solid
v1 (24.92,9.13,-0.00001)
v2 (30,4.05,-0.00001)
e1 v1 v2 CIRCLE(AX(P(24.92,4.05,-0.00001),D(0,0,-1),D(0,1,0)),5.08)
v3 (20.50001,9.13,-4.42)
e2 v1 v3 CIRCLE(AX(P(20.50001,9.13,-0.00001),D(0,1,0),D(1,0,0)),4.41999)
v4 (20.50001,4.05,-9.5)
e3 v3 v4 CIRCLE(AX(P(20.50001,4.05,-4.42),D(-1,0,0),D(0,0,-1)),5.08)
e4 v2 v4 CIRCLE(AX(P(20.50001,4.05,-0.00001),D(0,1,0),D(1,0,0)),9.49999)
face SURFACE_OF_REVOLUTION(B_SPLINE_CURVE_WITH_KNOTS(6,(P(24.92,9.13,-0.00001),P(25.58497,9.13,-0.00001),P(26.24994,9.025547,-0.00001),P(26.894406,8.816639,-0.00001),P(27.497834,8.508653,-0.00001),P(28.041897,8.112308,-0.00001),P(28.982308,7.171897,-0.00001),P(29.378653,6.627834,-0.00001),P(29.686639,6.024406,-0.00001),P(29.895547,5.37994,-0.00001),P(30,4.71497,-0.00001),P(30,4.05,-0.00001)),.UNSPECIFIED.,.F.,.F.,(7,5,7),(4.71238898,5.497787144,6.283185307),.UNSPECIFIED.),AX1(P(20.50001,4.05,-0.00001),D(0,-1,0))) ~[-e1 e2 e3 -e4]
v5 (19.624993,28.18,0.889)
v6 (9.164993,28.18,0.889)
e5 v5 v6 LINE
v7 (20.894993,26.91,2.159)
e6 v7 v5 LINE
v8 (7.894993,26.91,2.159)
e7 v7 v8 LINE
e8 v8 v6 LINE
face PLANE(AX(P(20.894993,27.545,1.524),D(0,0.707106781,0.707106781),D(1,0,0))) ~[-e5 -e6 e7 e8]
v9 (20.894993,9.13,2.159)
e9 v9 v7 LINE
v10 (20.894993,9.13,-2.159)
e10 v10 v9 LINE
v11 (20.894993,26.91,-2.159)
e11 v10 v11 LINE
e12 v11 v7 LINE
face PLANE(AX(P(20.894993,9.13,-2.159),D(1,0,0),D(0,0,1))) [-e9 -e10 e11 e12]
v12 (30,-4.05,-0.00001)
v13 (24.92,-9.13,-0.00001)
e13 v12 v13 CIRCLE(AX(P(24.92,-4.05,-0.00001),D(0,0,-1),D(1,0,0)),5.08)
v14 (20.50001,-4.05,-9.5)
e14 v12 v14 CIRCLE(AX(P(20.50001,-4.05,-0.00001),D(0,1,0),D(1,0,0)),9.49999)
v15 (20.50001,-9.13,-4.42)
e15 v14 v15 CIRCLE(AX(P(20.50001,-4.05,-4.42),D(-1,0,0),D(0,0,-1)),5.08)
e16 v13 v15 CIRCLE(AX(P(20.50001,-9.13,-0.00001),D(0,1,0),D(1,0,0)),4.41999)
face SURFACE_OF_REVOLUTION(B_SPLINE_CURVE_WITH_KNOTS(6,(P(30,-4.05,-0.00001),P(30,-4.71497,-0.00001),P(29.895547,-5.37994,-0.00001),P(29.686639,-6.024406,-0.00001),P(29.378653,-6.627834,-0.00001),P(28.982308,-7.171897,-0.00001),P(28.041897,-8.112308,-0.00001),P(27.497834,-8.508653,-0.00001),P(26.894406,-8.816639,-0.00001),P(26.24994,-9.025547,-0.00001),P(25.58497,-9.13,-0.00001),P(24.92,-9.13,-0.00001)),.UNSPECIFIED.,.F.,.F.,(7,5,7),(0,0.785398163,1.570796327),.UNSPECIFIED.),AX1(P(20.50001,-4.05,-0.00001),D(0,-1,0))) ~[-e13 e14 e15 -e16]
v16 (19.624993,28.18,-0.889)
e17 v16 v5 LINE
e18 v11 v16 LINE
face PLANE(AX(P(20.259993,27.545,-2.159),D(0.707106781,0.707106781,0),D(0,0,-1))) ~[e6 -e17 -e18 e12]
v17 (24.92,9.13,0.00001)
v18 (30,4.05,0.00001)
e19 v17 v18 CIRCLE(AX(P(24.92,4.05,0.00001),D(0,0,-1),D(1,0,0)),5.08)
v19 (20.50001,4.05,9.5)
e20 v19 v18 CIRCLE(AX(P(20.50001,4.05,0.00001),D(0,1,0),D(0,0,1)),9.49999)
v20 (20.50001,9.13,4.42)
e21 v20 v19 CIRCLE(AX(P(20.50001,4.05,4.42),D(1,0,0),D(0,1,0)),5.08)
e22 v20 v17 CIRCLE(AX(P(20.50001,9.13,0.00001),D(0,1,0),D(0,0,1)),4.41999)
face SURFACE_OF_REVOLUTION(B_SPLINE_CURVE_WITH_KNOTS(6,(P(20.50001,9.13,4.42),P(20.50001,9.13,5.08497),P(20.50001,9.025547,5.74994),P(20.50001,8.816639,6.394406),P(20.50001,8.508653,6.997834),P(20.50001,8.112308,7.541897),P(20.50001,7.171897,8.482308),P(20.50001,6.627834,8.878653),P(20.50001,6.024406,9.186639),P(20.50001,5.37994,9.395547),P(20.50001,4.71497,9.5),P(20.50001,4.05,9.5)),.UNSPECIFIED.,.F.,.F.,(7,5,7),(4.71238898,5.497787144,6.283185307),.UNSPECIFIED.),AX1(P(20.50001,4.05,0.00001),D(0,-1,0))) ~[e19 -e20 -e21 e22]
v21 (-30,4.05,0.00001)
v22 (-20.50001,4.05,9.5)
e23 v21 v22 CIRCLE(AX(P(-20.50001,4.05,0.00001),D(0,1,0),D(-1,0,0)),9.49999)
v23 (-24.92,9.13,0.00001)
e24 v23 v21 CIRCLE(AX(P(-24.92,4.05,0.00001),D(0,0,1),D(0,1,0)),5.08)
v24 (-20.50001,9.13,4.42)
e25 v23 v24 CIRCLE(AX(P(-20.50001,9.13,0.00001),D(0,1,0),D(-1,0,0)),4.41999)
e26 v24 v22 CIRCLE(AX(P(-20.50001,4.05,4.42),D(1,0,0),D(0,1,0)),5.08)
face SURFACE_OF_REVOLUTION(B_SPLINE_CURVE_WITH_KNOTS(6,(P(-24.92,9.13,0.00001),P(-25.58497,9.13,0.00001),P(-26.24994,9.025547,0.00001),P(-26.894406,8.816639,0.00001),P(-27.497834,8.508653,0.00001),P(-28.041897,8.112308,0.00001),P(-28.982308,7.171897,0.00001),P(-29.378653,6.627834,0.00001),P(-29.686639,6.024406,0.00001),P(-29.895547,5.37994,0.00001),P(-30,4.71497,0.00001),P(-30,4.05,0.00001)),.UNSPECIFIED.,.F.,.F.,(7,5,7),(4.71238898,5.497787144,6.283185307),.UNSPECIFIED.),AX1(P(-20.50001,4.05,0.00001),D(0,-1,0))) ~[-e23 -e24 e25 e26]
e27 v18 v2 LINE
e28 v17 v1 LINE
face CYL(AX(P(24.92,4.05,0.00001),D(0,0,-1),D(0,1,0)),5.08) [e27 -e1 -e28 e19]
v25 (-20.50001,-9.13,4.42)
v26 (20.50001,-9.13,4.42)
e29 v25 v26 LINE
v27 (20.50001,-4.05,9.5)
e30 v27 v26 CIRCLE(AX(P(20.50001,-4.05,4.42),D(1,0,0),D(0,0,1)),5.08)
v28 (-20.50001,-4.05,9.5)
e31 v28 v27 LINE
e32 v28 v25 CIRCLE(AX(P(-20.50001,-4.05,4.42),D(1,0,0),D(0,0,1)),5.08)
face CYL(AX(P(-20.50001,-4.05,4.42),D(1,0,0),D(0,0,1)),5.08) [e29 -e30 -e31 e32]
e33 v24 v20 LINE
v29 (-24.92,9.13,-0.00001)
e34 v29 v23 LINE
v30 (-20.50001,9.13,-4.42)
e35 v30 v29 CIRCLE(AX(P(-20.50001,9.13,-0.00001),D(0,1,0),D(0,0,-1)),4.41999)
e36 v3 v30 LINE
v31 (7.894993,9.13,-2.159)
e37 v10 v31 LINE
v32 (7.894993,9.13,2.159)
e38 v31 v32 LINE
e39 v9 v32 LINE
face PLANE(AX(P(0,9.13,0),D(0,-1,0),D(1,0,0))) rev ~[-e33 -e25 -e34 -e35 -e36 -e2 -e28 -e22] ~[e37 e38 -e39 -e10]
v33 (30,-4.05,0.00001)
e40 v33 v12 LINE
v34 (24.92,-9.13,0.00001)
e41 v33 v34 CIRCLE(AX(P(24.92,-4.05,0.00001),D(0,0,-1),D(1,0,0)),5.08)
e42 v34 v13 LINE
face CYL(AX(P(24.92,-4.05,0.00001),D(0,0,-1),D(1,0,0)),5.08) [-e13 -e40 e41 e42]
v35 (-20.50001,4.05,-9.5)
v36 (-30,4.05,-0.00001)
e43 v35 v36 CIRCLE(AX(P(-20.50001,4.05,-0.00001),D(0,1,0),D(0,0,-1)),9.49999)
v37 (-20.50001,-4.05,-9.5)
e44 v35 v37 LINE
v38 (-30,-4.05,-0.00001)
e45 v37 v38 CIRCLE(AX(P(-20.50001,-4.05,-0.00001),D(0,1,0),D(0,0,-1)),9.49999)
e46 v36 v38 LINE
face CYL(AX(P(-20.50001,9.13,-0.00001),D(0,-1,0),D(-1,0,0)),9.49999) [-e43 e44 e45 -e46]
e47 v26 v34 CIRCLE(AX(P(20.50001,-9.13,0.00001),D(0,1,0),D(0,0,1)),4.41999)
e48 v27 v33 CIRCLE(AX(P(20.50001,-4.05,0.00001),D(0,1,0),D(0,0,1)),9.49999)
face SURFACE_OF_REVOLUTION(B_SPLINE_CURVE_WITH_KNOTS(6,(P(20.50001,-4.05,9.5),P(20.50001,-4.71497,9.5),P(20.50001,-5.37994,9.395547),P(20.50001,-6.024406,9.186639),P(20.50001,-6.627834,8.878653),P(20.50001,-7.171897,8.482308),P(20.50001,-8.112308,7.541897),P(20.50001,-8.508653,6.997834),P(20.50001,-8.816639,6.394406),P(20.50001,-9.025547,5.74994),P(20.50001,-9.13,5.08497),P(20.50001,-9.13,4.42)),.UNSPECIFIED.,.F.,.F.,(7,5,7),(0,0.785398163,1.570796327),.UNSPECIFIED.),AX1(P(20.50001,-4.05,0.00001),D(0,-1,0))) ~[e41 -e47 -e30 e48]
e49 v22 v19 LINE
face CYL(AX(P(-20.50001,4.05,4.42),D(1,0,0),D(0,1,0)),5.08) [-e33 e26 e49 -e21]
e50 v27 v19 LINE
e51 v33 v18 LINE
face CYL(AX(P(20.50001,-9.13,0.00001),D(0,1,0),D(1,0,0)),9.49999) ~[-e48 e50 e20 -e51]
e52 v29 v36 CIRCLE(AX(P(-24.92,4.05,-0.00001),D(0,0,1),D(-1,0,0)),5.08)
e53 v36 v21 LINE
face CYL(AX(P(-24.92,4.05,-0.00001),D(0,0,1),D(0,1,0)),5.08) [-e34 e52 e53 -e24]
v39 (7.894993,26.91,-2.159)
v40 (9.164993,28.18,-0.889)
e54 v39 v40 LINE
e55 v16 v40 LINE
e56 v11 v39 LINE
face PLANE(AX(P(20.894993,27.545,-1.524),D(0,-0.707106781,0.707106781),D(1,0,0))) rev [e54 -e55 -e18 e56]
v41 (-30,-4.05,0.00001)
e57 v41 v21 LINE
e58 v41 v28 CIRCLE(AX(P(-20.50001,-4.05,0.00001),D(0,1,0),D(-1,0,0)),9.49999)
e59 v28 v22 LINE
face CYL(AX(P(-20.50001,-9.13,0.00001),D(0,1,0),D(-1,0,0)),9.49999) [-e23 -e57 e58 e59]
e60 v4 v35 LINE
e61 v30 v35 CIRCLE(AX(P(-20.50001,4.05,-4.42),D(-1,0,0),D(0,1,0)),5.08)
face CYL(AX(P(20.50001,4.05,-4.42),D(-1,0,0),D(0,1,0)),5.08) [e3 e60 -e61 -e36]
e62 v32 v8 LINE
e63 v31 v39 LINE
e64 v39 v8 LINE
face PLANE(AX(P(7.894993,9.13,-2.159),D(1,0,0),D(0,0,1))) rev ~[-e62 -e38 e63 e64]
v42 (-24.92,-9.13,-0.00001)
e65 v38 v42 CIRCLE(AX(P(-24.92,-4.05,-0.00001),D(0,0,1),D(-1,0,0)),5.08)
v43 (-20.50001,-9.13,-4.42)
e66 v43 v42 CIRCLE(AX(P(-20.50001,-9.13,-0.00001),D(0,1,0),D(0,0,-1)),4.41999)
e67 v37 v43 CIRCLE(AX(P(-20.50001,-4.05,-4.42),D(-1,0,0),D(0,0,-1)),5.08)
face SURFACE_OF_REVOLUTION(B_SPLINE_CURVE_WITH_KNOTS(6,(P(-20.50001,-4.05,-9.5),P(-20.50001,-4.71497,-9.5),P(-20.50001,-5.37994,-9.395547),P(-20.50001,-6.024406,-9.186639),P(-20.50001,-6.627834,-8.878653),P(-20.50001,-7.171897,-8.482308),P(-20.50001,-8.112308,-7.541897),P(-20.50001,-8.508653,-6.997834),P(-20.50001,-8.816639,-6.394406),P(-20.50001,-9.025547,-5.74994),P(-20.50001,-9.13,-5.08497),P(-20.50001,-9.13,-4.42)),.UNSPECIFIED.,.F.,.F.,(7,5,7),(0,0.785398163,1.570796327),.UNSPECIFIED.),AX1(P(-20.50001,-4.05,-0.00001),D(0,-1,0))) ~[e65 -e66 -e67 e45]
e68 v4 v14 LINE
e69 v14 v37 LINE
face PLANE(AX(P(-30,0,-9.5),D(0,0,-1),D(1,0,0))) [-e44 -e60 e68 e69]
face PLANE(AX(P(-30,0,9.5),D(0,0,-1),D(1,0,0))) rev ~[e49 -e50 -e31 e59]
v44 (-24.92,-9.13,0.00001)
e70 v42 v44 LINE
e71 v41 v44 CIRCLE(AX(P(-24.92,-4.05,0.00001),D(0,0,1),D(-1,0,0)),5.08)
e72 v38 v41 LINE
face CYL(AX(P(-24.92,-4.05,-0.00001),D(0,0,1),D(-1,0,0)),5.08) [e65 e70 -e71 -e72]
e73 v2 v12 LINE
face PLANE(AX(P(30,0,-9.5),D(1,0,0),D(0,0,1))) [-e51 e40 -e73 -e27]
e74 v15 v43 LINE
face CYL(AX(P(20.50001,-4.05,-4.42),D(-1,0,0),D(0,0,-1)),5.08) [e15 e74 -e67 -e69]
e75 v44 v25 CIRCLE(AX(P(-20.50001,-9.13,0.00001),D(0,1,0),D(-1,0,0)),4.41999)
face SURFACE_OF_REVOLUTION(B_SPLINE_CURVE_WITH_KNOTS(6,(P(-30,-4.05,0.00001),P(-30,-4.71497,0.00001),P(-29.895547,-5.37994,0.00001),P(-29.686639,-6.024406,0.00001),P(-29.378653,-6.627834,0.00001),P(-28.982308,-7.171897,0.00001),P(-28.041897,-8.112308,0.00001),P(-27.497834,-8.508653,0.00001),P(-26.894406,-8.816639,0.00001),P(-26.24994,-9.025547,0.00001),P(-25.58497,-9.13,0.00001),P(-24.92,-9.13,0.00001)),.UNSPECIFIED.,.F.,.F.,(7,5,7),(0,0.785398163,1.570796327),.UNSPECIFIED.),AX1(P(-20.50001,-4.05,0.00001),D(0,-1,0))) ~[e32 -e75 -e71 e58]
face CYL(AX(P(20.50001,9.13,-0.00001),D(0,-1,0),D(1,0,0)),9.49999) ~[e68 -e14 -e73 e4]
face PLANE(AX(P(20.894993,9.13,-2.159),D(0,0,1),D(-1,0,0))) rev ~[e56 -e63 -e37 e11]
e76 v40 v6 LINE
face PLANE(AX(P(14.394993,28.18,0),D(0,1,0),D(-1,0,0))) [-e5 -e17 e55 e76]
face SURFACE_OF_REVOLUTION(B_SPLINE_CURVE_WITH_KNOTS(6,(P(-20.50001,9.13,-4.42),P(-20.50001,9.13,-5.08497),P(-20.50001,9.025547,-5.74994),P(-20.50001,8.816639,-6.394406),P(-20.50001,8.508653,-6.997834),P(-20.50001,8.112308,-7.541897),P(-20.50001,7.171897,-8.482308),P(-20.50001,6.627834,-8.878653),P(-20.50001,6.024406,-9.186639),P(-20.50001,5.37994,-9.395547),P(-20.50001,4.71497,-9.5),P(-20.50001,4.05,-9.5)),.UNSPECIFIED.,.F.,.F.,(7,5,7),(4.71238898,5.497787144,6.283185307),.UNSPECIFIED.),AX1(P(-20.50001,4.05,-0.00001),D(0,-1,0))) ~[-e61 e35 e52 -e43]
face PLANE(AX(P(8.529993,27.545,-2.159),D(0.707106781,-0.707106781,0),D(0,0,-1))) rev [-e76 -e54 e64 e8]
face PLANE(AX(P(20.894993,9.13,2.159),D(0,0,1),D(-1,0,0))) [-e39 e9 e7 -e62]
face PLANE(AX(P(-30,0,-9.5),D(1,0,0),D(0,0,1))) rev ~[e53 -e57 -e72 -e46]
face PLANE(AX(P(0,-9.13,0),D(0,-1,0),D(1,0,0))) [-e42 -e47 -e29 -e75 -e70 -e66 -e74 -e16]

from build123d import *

# Parameters (mm, degrees)
F0_W     = 60
F0_H     = 19
F1_DEPTH = 9.13
F2_R     = 9.49999
F3_W     = 13
F3_H     = 4.318
F4_DEPTH = 19.05
F5_SIZE  = 1.27
F6_R     = 5.08


# Not quite as in the source:
# - a fillet or chamfer is up to 0.001 mm smaller than in the source, because OpenCascade refuses the exact size


with BuildPart() as f1:
    # F0 (on Front) → F1 (new body, symmetric)
    with BuildSketch(Plane.XZ):
        Rectangle(F0_W, F0_H)
    extrude(amount=F1_DEPTH, both=True)

    # F2 (radius 9.5 in the source; OpenCascade refuses exactly that, so slightly less here)
    f2_edges = [f1.edges().sort_by_distance(p)[0] for p in [
        (30, 0, 9.5),
        (30, 0, -9.5),
        (-30, 0, 9.5),
        (-30, 0, -9.5),
    ]]
    fillet(f2_edges, radius=F2_R)

    # F3 (on face) → F4 (join)
    with BuildSketch(Plane(origin=(0, 9.13, 0), x_dir=(-1, 0, 0), z_dir=(0, 1, 0))):
        with Locations((-14.3949933554, 0)):
            Rectangle(F3_W, F3_H)
    extrude(amount=F4_DEPTH)

    # F5
    f5_edges = [f1.edges().sort_by_distance(p)[0] for p in [
        (14.394993, 28.18, 2.159),
        (20.894993, 28.18, 0),
        (7.894993, 28.18, 0),
        (14.394993, 28.18, -2.159),
    ]]
    chamfer(f5_edges, length=F5_SIZE)

    # F6
    f6_edges = [f1.edges().sort_by_distance(p)[0] for p in [
        (0, 9.13, 9.5),
        (0, -9.13, 9.5),
    ]]
    fillet(f6_edges, radius=F6_R)


solid = f1.part
